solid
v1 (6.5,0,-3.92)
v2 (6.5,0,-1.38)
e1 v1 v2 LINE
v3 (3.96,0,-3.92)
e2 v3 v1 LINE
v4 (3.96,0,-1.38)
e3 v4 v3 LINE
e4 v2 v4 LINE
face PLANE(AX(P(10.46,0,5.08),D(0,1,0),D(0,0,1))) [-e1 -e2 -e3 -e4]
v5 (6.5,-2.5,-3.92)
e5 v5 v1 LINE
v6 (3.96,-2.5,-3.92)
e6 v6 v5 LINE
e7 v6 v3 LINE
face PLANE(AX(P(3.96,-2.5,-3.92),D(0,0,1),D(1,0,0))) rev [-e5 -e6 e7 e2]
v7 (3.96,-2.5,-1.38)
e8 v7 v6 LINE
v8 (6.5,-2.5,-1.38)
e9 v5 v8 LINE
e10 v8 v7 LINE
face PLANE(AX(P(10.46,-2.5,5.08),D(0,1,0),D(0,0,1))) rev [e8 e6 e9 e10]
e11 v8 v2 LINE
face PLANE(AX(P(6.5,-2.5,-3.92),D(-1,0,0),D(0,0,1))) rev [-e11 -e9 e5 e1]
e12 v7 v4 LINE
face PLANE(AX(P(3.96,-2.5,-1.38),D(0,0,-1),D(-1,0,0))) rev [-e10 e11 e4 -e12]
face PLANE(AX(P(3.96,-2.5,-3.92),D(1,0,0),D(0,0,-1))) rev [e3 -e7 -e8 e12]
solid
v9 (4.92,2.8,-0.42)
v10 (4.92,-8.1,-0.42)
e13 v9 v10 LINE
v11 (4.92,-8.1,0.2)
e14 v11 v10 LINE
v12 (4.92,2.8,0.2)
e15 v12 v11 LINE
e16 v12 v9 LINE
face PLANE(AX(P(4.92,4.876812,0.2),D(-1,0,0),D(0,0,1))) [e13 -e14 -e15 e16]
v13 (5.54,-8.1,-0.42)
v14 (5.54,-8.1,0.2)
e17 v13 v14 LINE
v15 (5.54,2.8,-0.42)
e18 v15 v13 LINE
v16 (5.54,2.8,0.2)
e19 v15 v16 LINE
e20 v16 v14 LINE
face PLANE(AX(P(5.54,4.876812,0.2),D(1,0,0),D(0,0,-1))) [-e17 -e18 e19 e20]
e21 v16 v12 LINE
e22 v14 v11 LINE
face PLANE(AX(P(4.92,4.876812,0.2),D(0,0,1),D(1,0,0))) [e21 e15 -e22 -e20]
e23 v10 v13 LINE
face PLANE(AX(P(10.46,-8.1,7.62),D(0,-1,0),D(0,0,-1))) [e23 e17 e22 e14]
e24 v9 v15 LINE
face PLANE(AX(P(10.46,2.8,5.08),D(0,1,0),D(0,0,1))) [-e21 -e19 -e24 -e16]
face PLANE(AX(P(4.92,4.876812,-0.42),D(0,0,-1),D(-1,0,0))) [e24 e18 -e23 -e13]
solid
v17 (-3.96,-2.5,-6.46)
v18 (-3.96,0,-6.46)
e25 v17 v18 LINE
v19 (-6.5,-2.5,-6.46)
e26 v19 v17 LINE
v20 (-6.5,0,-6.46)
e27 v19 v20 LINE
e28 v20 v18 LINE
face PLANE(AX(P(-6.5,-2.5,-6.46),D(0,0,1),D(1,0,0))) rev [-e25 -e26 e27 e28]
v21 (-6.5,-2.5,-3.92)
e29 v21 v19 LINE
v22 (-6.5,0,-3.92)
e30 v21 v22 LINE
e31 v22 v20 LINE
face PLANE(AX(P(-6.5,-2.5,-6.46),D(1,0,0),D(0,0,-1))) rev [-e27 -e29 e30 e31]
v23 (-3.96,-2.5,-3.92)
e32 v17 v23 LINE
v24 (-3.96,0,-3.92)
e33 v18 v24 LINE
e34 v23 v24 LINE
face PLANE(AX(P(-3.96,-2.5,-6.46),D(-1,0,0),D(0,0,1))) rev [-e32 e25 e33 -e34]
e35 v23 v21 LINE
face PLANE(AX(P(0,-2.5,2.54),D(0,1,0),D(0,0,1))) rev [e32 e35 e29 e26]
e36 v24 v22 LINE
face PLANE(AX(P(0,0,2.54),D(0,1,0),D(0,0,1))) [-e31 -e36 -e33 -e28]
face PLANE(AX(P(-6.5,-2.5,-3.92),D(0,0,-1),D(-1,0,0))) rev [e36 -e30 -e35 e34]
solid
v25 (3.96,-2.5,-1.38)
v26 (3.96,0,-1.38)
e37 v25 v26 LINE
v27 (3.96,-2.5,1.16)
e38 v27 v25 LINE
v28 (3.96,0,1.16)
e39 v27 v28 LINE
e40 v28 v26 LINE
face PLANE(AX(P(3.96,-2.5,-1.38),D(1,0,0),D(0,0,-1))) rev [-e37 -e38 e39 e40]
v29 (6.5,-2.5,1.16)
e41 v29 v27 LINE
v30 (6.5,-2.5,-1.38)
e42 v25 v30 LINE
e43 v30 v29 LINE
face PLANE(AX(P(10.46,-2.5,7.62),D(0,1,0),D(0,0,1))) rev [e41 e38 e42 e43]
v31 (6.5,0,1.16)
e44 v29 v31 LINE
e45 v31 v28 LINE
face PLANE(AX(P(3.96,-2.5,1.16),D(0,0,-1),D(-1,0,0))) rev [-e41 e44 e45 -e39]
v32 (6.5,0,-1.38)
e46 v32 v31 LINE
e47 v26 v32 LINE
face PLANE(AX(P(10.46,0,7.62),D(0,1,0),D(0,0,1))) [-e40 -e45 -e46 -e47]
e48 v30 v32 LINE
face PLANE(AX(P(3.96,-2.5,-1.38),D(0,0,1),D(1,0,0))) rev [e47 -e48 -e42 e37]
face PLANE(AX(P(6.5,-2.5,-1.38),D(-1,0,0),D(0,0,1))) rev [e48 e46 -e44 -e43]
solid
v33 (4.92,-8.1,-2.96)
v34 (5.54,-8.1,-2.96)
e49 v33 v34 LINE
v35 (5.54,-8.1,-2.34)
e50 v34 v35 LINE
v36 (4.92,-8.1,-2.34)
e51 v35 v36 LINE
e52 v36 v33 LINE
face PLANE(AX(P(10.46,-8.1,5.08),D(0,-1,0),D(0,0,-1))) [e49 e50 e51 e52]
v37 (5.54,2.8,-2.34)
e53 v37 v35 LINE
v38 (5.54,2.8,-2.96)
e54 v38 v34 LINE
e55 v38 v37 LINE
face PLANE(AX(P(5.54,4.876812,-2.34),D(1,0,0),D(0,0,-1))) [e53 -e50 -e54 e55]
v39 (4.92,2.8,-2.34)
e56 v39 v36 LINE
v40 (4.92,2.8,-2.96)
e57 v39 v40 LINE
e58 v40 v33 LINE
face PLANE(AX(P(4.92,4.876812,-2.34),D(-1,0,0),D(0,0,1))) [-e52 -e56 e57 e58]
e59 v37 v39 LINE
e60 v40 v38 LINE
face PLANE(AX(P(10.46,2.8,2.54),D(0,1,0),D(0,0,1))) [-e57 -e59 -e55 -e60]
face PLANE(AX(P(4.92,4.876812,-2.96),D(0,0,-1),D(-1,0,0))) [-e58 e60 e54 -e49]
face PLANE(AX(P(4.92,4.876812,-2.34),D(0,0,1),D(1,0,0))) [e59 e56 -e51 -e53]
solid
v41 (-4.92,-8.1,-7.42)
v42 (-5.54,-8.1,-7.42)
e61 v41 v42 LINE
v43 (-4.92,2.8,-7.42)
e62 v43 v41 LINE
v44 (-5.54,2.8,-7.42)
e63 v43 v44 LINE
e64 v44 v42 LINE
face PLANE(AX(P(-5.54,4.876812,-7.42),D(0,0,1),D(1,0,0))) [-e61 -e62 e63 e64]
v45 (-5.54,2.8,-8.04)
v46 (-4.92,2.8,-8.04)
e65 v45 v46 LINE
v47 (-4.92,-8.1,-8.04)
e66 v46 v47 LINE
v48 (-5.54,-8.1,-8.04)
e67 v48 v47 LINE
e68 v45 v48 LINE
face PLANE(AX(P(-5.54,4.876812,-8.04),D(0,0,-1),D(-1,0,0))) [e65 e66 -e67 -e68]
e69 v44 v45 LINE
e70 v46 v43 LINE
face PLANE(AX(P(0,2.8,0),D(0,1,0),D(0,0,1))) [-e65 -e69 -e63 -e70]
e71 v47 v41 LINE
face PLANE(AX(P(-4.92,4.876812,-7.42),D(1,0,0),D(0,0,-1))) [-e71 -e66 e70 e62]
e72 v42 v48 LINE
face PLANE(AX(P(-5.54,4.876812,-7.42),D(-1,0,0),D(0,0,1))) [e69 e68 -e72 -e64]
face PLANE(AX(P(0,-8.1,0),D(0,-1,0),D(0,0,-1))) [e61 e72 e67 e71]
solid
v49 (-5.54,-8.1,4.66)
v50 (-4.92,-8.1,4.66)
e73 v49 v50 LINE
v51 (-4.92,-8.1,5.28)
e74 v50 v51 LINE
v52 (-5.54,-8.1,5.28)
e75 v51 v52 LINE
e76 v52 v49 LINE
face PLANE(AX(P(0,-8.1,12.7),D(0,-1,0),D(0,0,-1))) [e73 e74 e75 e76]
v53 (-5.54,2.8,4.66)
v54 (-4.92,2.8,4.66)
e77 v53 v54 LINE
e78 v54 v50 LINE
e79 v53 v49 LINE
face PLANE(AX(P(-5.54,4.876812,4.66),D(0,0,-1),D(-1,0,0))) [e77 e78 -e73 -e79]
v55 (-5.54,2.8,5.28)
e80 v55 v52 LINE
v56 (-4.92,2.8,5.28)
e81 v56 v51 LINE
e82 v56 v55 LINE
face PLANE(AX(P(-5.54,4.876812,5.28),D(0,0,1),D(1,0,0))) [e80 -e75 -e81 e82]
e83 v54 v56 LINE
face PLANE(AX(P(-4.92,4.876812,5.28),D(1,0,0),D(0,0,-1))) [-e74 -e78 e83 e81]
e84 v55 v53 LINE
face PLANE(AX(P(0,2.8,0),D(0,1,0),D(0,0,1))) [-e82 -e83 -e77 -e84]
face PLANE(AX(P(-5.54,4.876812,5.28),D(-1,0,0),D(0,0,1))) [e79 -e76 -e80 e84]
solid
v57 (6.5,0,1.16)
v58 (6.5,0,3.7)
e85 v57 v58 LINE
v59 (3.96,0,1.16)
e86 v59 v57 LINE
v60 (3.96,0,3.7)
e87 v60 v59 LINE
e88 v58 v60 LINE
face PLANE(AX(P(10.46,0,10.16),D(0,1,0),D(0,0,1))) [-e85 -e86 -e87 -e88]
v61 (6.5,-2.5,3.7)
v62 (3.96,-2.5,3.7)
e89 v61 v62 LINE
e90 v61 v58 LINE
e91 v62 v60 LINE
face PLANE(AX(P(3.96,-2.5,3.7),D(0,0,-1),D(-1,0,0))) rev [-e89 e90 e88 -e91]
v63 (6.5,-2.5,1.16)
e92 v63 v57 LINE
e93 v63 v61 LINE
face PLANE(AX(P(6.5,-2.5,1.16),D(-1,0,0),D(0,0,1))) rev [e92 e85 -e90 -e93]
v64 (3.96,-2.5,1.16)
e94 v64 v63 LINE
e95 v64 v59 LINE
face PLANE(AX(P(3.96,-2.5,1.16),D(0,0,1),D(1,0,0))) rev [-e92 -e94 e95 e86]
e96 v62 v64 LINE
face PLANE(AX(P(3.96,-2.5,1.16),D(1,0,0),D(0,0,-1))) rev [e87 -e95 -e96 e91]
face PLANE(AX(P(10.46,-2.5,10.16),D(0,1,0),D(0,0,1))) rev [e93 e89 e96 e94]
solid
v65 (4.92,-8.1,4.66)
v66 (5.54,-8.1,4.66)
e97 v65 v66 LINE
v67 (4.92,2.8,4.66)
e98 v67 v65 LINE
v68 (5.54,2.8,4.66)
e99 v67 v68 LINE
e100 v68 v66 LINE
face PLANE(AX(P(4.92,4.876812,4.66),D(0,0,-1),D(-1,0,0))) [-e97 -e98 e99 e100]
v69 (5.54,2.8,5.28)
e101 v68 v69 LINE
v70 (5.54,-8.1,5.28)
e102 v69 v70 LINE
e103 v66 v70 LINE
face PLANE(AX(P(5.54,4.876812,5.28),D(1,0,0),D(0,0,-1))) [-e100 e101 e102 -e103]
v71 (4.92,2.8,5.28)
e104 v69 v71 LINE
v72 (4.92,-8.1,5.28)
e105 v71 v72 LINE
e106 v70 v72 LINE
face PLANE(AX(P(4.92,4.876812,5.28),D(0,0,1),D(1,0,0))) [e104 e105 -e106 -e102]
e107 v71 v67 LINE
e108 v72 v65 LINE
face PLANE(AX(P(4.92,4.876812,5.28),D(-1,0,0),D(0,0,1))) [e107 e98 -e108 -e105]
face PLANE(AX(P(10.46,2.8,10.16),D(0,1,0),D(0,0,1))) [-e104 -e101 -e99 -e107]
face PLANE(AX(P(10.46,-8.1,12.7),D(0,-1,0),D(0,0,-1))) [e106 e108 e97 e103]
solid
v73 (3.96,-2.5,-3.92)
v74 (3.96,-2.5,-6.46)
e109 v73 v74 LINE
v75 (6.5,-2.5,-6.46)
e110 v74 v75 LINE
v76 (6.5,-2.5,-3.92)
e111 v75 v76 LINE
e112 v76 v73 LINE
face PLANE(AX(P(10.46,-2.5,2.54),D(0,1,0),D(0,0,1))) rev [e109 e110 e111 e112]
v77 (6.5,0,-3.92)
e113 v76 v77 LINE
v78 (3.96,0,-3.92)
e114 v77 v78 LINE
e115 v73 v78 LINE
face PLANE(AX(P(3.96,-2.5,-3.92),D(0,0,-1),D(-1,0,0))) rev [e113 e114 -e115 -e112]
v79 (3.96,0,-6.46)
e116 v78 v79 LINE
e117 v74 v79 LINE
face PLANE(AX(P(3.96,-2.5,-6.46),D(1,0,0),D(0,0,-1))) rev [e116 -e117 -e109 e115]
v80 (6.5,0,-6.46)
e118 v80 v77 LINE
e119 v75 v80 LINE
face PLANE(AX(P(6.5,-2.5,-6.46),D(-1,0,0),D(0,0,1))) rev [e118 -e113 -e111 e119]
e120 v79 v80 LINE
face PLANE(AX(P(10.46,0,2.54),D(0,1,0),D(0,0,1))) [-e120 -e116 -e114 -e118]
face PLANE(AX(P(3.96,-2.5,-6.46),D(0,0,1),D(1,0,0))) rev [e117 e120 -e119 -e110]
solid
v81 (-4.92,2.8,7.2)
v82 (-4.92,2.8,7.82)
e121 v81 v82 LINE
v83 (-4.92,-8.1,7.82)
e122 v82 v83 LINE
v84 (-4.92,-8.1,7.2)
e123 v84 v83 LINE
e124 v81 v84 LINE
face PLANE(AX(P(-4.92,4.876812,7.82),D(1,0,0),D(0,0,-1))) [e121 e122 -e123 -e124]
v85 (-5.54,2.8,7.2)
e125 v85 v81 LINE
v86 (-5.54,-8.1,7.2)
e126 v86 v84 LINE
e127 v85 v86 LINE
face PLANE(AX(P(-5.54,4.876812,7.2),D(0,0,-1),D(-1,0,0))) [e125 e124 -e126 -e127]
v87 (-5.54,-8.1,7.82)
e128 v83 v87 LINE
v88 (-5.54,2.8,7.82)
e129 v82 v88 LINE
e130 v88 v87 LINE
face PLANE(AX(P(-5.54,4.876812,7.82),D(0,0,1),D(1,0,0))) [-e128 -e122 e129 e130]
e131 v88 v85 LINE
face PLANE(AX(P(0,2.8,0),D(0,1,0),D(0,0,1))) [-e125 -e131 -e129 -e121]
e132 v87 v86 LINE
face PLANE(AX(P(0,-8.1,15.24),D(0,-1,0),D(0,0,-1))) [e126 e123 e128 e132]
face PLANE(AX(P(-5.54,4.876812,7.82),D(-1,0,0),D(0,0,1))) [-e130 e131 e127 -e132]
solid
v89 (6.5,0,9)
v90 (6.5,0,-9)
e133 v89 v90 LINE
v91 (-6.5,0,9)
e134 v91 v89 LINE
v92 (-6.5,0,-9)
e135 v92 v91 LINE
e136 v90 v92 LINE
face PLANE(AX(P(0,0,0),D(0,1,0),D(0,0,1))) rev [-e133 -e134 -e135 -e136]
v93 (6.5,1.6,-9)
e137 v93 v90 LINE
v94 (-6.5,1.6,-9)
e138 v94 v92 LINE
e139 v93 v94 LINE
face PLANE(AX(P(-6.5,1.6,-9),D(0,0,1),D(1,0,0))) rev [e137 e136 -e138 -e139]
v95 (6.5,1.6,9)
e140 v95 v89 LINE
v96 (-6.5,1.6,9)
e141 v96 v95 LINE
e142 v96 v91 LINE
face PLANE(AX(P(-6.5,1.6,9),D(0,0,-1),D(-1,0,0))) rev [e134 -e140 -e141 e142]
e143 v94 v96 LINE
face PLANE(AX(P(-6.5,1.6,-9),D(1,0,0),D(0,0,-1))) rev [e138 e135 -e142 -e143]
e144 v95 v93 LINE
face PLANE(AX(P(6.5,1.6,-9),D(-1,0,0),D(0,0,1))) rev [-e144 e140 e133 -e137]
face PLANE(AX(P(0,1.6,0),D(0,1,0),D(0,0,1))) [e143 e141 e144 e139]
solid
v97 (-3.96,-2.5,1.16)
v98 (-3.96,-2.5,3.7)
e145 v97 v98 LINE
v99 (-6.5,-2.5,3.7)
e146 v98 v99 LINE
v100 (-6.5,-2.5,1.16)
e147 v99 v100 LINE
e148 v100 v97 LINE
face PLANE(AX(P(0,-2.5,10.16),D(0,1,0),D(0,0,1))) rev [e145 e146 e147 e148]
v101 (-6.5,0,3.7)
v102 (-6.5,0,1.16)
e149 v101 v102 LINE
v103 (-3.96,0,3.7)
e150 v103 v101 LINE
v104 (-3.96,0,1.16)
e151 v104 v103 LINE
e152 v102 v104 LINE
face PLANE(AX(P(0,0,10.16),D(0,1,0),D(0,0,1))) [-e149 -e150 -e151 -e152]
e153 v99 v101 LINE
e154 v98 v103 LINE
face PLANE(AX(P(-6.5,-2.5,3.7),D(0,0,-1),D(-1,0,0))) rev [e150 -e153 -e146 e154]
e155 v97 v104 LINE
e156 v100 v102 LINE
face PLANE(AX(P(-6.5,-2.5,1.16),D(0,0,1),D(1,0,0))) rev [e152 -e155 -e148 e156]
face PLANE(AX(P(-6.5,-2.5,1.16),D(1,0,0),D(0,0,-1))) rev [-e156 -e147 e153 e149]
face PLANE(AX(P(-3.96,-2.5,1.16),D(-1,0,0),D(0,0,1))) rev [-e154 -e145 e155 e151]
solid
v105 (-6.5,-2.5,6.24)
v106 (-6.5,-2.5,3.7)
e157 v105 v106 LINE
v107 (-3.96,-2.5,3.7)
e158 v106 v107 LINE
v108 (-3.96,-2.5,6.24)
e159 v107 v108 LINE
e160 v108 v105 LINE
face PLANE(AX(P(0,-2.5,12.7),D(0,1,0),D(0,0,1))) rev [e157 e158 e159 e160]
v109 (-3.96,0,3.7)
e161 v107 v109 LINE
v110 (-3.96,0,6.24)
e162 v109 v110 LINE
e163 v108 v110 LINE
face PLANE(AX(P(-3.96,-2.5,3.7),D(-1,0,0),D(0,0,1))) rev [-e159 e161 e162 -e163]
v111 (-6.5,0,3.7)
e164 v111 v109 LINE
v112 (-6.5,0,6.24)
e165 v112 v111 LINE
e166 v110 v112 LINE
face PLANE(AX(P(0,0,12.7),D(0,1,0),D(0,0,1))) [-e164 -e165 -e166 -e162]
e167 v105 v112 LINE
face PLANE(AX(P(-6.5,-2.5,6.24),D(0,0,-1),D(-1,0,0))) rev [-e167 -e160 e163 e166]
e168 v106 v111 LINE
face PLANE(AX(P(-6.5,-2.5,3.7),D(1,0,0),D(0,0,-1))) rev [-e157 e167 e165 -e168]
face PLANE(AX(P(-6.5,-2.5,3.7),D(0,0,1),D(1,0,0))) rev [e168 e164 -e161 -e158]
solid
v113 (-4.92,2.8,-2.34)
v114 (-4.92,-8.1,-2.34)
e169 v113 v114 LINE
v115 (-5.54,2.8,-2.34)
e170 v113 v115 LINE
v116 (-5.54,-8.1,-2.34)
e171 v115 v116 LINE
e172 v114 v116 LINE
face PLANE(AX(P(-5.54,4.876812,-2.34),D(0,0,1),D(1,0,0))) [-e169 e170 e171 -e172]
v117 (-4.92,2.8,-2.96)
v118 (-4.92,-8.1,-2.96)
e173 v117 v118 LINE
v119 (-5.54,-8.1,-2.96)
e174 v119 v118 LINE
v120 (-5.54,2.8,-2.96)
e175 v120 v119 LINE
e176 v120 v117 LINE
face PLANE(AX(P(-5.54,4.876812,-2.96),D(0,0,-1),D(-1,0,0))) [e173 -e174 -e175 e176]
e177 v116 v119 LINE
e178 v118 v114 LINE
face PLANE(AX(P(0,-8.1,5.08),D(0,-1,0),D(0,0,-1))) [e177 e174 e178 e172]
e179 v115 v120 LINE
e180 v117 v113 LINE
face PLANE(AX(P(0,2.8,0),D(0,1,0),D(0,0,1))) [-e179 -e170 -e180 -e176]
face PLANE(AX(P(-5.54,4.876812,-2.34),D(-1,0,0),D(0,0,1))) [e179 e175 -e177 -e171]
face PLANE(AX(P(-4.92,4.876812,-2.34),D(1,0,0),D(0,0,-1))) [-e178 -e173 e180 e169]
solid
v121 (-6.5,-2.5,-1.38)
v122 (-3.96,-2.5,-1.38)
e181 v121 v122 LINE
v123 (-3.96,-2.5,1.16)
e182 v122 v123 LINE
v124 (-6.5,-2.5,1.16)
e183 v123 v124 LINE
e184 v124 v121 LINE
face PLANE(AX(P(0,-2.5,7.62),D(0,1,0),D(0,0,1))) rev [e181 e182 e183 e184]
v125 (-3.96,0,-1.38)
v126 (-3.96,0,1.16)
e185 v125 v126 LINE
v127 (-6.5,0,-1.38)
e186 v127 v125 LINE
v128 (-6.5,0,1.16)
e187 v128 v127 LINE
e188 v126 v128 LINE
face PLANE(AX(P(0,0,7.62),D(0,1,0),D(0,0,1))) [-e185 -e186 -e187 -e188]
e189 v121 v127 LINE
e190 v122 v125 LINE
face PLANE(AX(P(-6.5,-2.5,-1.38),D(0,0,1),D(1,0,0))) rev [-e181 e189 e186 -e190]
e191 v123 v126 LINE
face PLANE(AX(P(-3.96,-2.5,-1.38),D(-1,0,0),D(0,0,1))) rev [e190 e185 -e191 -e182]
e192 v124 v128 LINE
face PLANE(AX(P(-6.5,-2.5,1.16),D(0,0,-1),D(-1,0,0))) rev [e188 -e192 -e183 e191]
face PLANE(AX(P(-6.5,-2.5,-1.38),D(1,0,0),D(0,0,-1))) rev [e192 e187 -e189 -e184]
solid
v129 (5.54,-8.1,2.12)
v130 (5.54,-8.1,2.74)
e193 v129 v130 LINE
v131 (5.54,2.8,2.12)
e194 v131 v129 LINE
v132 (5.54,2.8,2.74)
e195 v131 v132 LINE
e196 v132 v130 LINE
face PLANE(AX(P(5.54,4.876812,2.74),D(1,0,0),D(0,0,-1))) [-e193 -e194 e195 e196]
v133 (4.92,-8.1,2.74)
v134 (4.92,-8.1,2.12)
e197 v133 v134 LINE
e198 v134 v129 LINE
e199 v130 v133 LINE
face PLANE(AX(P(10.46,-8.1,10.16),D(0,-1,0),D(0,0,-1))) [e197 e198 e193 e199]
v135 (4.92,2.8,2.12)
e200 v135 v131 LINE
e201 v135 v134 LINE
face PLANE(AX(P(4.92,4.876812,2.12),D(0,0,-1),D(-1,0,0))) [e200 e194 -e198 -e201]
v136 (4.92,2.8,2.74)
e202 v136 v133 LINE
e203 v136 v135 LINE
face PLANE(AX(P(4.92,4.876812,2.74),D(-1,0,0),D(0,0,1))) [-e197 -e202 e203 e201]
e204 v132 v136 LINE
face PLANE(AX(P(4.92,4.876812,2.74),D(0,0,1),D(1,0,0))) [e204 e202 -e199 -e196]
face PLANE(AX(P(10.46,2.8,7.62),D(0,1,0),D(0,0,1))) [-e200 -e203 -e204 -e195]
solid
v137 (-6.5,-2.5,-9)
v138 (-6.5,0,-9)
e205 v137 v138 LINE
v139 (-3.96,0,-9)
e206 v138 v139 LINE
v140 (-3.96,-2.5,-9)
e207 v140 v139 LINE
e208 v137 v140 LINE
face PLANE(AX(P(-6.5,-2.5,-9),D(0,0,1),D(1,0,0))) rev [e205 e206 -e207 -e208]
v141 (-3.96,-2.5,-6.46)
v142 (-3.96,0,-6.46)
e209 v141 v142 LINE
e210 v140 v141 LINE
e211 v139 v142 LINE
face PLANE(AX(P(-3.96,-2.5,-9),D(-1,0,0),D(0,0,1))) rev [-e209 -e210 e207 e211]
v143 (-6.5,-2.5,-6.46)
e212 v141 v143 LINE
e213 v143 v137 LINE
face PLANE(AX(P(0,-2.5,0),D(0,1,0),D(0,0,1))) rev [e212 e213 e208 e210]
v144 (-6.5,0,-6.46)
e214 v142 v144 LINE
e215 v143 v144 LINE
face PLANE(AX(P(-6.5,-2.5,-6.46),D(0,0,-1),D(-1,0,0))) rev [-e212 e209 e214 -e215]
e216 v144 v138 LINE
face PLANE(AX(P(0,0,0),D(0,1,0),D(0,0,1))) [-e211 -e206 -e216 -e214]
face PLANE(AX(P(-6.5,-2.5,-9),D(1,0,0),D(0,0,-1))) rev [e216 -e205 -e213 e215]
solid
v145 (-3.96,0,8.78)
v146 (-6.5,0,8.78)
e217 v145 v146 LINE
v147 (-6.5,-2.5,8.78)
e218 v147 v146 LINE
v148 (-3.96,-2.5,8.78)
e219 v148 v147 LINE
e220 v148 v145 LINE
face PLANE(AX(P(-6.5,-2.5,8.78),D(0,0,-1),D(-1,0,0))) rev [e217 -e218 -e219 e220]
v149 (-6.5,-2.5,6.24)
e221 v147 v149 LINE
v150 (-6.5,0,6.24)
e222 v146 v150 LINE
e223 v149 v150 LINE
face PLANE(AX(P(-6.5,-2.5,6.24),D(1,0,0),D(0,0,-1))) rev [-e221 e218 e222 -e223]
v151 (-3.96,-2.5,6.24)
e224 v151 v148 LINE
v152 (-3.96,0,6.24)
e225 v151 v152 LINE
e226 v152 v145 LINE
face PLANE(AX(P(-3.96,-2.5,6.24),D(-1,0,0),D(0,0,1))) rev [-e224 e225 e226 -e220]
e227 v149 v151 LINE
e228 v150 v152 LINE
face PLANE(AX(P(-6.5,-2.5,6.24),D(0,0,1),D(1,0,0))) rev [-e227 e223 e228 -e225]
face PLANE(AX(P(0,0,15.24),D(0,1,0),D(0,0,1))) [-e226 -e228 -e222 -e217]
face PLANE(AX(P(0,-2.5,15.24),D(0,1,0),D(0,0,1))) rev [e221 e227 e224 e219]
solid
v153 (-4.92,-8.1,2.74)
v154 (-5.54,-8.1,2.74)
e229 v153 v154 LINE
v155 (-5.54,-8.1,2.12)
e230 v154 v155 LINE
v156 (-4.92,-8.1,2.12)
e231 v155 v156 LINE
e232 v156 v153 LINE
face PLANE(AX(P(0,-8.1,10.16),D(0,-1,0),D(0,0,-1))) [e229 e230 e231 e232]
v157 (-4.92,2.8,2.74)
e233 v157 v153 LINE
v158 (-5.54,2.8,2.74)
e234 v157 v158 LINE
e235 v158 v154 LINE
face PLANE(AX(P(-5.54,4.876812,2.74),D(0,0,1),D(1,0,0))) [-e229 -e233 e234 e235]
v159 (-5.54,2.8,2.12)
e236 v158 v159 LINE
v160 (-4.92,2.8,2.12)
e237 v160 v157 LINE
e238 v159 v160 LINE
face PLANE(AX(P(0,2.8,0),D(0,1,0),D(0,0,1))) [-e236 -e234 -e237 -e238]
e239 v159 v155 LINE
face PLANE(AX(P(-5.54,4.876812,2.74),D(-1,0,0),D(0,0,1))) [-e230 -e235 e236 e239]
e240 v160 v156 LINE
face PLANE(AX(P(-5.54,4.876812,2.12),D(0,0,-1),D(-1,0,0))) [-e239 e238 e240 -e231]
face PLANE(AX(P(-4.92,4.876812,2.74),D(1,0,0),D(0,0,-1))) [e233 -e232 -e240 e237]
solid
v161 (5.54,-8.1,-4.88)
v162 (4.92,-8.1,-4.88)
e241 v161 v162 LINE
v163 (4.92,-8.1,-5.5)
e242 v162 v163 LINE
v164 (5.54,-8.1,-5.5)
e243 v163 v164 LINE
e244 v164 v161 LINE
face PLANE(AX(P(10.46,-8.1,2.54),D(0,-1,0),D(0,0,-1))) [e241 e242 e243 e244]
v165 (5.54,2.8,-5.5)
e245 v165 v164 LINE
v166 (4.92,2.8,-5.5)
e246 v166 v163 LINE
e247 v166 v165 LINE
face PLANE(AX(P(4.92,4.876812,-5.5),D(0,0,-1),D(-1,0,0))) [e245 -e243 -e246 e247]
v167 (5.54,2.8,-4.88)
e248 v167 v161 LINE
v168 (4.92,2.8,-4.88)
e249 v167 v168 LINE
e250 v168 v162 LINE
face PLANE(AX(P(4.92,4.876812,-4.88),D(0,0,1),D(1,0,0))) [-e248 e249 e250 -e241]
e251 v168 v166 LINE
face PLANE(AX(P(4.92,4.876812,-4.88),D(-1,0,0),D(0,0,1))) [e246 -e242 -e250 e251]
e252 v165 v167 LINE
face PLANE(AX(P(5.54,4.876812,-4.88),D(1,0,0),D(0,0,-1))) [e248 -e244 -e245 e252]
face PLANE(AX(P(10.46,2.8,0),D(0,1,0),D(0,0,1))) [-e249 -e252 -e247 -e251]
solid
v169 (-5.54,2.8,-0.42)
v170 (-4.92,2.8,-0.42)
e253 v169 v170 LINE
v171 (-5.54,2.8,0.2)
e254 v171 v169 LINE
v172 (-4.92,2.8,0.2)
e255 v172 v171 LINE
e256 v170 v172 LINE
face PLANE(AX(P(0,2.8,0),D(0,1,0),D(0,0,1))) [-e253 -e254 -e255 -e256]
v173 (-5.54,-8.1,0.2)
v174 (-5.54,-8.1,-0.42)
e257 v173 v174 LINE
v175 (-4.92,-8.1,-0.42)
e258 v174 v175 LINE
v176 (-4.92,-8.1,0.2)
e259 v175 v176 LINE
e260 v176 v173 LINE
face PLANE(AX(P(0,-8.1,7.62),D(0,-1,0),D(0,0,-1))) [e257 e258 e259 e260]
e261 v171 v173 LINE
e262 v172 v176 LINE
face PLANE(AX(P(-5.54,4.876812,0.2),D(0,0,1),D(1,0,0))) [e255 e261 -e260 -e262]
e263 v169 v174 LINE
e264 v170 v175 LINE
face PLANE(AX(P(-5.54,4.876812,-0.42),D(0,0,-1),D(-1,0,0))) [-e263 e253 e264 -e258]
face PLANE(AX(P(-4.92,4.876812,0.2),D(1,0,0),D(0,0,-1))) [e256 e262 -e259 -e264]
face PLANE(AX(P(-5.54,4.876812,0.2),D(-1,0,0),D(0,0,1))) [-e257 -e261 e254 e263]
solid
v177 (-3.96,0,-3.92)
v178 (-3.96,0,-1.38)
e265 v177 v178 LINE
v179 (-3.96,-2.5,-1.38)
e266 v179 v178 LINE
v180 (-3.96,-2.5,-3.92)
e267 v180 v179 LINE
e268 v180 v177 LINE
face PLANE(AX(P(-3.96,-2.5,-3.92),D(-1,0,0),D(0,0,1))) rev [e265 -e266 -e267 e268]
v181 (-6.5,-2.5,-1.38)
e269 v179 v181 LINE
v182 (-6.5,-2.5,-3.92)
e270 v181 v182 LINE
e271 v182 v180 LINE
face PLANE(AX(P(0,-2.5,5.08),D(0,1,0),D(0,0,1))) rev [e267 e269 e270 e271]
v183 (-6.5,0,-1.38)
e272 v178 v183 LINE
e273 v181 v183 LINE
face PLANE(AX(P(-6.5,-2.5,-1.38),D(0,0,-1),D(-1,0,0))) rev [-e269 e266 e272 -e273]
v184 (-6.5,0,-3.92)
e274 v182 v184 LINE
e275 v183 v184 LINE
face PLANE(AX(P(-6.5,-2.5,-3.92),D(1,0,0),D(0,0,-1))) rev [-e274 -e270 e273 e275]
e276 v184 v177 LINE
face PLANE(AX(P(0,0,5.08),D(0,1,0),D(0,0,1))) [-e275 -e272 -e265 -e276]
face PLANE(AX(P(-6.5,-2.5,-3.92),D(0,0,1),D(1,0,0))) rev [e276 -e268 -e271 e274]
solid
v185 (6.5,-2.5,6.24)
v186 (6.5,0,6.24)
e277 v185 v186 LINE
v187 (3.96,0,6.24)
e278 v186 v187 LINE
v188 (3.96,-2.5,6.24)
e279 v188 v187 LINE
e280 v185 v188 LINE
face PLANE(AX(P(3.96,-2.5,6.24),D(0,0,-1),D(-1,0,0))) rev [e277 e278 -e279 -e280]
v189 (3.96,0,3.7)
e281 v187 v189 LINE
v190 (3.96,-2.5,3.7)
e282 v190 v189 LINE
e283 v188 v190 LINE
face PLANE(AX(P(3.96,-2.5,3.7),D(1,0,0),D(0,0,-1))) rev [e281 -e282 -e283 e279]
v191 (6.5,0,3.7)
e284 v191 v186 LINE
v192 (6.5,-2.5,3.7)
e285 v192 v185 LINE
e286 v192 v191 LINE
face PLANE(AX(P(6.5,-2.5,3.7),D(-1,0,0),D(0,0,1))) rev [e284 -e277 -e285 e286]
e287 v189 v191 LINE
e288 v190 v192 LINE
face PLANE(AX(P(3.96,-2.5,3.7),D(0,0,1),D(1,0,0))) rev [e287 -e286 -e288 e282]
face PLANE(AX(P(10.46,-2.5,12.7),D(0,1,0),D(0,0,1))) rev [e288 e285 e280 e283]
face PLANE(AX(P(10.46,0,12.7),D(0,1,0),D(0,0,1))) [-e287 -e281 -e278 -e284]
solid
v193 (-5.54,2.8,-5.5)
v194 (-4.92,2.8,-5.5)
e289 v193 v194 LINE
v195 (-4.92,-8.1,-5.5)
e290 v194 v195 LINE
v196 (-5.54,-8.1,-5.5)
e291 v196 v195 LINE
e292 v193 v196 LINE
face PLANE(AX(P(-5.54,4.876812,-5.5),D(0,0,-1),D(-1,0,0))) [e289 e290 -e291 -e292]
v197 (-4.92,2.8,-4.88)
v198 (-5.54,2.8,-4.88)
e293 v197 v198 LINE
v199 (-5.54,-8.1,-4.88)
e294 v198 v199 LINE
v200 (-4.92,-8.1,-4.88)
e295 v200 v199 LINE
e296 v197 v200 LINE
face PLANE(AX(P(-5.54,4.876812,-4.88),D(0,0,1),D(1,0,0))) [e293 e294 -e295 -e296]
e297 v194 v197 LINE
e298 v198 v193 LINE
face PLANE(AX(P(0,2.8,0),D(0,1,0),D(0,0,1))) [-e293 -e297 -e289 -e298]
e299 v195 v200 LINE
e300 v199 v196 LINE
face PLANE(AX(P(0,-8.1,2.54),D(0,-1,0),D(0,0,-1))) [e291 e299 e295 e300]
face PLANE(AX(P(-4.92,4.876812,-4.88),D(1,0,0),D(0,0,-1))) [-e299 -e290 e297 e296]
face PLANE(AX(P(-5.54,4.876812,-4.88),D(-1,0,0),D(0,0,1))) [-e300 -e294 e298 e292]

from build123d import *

# Parameters (mm, degrees)
SKETCH1_W              = 13
SKETCH1_H              = 18
BOSS_EXTRUDE1_DEPTH    = 1.6
SKETCH6_W              = 2.54
SKETCH6_H              = 2.54
BOSS_EXTRUDE2_DEPTH    = 2.5
BOSS_EXTRUDE3_START    = -5.3
SKETCH7_W              = 0.62
SKETCH7_H              = 0.62
BOSS_EXTRUDE3_DEPTH    = 10.9
LPATTERN1_START        = -8.1
LPATTERN1_OUTLINE_W    = 0.62
LPATTERN1_OUTLINE_H    = 0.62
LPATTERN1_DEPTH        = 10.9
LPATTERN1_2_OUTLINE_W  = 0.62
LPATTERN1_2_OUTLINE_H  = 0.62
LPATTERN1_2_DEPTH      = 10.9
LPATTERN1_3_OUTLINE_W  = 0.62
LPATTERN1_3_OUTLINE_H  = 0.62
LPATTERN1_3_DEPTH      = 10.9
LPATTERN1_4_OUTLINE_W  = 0.62
LPATTERN1_4_OUTLINE_H  = 0.62
LPATTERN1_4_DEPTH      = 10.9
LPATTERN1_5_OUTLINE_W  = 0.62
LPATTERN1_5_OUTLINE_H  = 0.62
LPATTERN1_5_DEPTH      = 10.9
LPATTERN1_6_OUTLINE_W  = 0.62
LPATTERN1_6_OUTLINE_H  = 0.62
LPATTERN1_6_DEPTH      = 10.9
LPATTERN1_START_2      = -6.5
LPATTERN1_7_OUTLINE_W  = 2.5
LPATTERN1_7_OUTLINE_H  = 2.54
LPATTERN1_7_DEPTH      = 2.54
LPATTERN1_8_OUTLINE_W  = 2.5
LPATTERN1_8_OUTLINE_H  = 2.54
LPATTERN1_8_DEPTH      = 2.54
LPATTERN1_9_OUTLINE_W  = 2.5
LPATTERN1_9_OUTLINE_H  = 2.54
LPATTERN1_9_DEPTH      = 2.54
LPATTERN1_10_OUTLINE_W = 2.5
LPATTERN1_10_OUTLINE_H = 2.54
LPATTERN1_10_DEPTH     = 2.54
LPATTERN1_11_OUTLINE_W = 2.5
LPATTERN1_11_OUTLINE_H = 2.54
LPATTERN1_11_DEPTH     = 2.54
LPATTERN1_12_OUTLINE_W = 2.5
LPATTERN1_12_OUTLINE_H = 2.54
LPATTERN1_12_DEPTH     = 2.54
LPATTERN2_START        = -2.5
LPATTERN2_OUTLINE_W    = 2.54
LPATTERN2_OUTLINE_H    = 2.54
LPATTERN2_DEPTH        = 2.5
LPATTERN2_START_2      = -8.1
LPATTERN2_2_OUTLINE_W  = 0.62
LPATTERN2_2_OUTLINE_H  = 0.62
LPATTERN2_2_DEPTH      = 10.9
LPATTERN3_COUNT        = 5
LPATTERN3_PITCH        = 2.54


# Read off the part's stored shape, not the designer's step: LPattern1, LPattern2
with BuildPart() as part:
    # Sketch1 → Boss-Extrude1 (new body)
    with BuildSketch(Plane(origin=(0, 0, 0), x_dir=(1, 0, 0), z_dir=(0, 1, 0))):
        Rectangle(SKETCH1_W, SKETCH1_H)
    extrude(amount=BOSS_EXTRUDE1_DEPTH)


with BuildPart() as body_2:
    # Sketch6 → Boss-Extrude2 (new body)
    with BuildSketch(Plane.XZ):
        with Locations((-5.23, -7.73)):
            Rectangle(SKETCH6_W, SKETCH6_H)
    extrude(amount=BOSS_EXTRUDE2_DEPTH)


with BuildPart() as body_3:
    # Sketch7 → Boss-Extrude3 (new body)
    with BuildSketch(Plane.XZ.offset(2.5).offset(BOSS_EXTRUDE3_START)):
        with Locations((-5.23, -7.73)):
            Rectangle(SKETCH7_W, SKETCH7_H)
    extrude(amount=BOSS_EXTRUDE3_DEPTH)


with BuildPart() as body_4:
    # LPattern1 outline → LPattern1 (new body)
    with BuildSketch(Plane(origin=(0, 0, 0), x_dir=(1, 0, 0), z_dir=(0, 1, 0)).offset(LPATTERN1_START)):
        with Locations((-5.23, -7.51)):
            Rectangle(LPATTERN1_OUTLINE_W, LPATTERN1_OUTLINE_H)
    extrude(amount=LPATTERN1_DEPTH)


with BuildPart() as body_5:
    # LPattern1 2 outline → LPattern1 2 (new body)
    with BuildSketch(Plane(origin=(0, 0, 0), x_dir=(1, 0, 0), z_dir=(0, 1, 0)).offset(LPATTERN1_START)):
        with Locations((-5.23, -4.97)):
            Rectangle(LPATTERN1_2_OUTLINE_W, LPATTERN1_2_OUTLINE_H)
    extrude(amount=LPATTERN1_2_DEPTH)


with BuildPart() as body_6:
    # LPattern1 3 outline → LPattern1 3 (new body)
    with BuildSketch(Plane(origin=(0, 0, 0), x_dir=(1, 0, 0), z_dir=(0, 1, 0)).offset(LPATTERN1_START)):
        with Locations((-5.23, -2.43)):
            Rectangle(LPATTERN1_3_OUTLINE_W, LPATTERN1_3_OUTLINE_H)
    extrude(amount=LPATTERN1_3_DEPTH)


with BuildPart() as body_7:
    # LPattern1 4 outline → LPattern1 4 (new body)
    with BuildSketch(Plane(origin=(0, 0, 0), x_dir=(1, 0, 0), z_dir=(0, 1, 0)).offset(LPATTERN1_START)):
        with Locations((-5.23, 0.11)):
            Rectangle(LPATTERN1_4_OUTLINE_W, LPATTERN1_4_OUTLINE_H)
    extrude(amount=LPATTERN1_4_DEPTH)


with BuildPart() as body_8:
    # LPattern1 5 outline → LPattern1 5 (new body)
    with BuildSketch(Plane(origin=(0, 0, 0), x_dir=(1, 0, 0), z_dir=(0, 1, 0)).offset(LPATTERN1_START)):
        with Locations((-5.23, 2.65)):
            Rectangle(LPATTERN1_5_OUTLINE_W, LPATTERN1_5_OUTLINE_H)
    extrude(amount=LPATTERN1_5_DEPTH)


with BuildPart() as body_9:
    # LPattern1 6 outline → LPattern1 6 (new body)
    with BuildSketch(Plane(origin=(0, 0, 0), x_dir=(1, 0, 0), z_dir=(0, 1, 0)).offset(LPATTERN1_START)):
        with Locations((-5.23, 5.19)):
            Rectangle(LPATTERN1_6_OUTLINE_W, LPATTERN1_6_OUTLINE_H)
    extrude(amount=LPATTERN1_6_DEPTH)


with BuildPart() as body_10:
    # LPattern1 7 outline → LPattern1 7 (new body)
    with BuildSketch(Plane.YZ.offset(LPATTERN1_START_2)):
        with Locations((-1.25, 7.51)):
            Rectangle(LPATTERN1_7_OUTLINE_W, LPATTERN1_7_OUTLINE_H)
    extrude(amount=LPATTERN1_7_DEPTH)


with BuildPart() as body_11:
    # LPattern1 8 outline → LPattern1 8 (new body)
    with BuildSketch(Plane.YZ.offset(LPATTERN1_START_2)):
        with Locations((-1.25, 4.97)):
            Rectangle(LPATTERN1_8_OUTLINE_W, LPATTERN1_8_OUTLINE_H)
    extrude(amount=LPATTERN1_8_DEPTH)


with BuildPart() as body_12:
    # LPattern1 9 outline → LPattern1 9 (new body)
    with BuildSketch(Plane.YZ.offset(LPATTERN1_START_2)):
        with Locations((-1.25, 2.43)):
            Rectangle(LPATTERN1_9_OUTLINE_W, LPATTERN1_9_OUTLINE_H)
    extrude(amount=LPATTERN1_9_DEPTH)


with BuildPart() as body_13:
    # LPattern1 10 outline → LPattern1 10 (new body)
    with BuildSketch(Plane.YZ.offset(LPATTERN1_START_2)):
        with Locations((-1.25, -0.11)):
            Rectangle(LPATTERN1_10_OUTLINE_W, LPATTERN1_10_OUTLINE_H)
    extrude(amount=LPATTERN1_10_DEPTH)


with BuildPart() as body_14:
    # LPattern1 11 outline → LPattern1 11 (new body)
    with BuildSketch(Plane.YZ.offset(LPATTERN1_START_2)):
        with Locations((-1.25, -2.65)):
            Rectangle(LPATTERN1_11_OUTLINE_W, LPATTERN1_11_OUTLINE_H)
    extrude(amount=LPATTERN1_11_DEPTH)


with BuildPart() as body_15:
    # LPattern1 12 outline → LPattern1 12 (new body)
    with BuildSketch(Plane.YZ.offset(LPATTERN1_START_2)):
        with Locations((-1.25, -5.19)):
            Rectangle(LPATTERN1_12_OUTLINE_W, LPATTERN1_12_OUTLINE_H)
    extrude(amount=LPATTERN1_12_DEPTH)


with BuildPart() as body_16:
    # LPattern2 outline → LPattern2 (new body)
    with BuildSketch(Plane(origin=(0, 0, 0), x_dir=(1, 0, 0), z_dir=(0, 1, 0)).offset(LPATTERN2_START)):
        with Locations((5.23, 5.19)):
            Rectangle(LPATTERN2_OUTLINE_W, LPATTERN2_OUTLINE_H)
    extrude(amount=LPATTERN2_DEPTH)


with BuildPart() as body_17:
    # LPattern2 2 outline → LPattern2 2 (new body)
    with BuildSketch(Plane(origin=(0, 0, 0), x_dir=(1, 0, 0), z_dir=(0, 1, 0)).offset(LPATTERN2_START_2)):
        with Locations((5.23, 5.19)):
            Rectangle(LPATTERN2_2_OUTLINE_W, LPATTERN2_2_OUTLINE_H)
    extrude(amount=LPATTERN2_2_DEPTH)


with BuildPart() as lpattern3_1:
    # LPattern3: pattern copy
    add(body_17.part.moved(Location(Vector(0, 0, 1) * (1 * LPATTERN3_PITCH))))


with BuildPart() as lpattern3_2:
    # LPattern3: pattern copy
    add(body_17.part.moved(Location(Vector(0, 0, 1) * (2 * LPATTERN3_PITCH))))


with BuildPart() as lpattern3_3:
    # LPattern3: pattern copy
    add(body_17.part.moved(Location(Vector(0, 0, 1) * (3 * LPATTERN3_PITCH))))


with BuildPart() as lpattern3_4:
    # LPattern3: pattern copy
    add(body_17.part.moved(Location(Vector(0, 0, 1) * (4 * LPATTERN3_PITCH))))


with BuildPart() as lpattern3_5:
    # LPattern3: pattern copy
    add(body_16.part.moved(Location(Vector(0, 0, 1) * (1 * LPATTERN3_PITCH))))


with BuildPart() as lpattern3_6:
    # LPattern3: pattern copy
    add(body_16.part.moved(Location(Vector(0, 0, 1) * (2 * LPATTERN3_PITCH))))


with BuildPart() as lpattern3_7:
    # LPattern3: pattern copy
    add(body_16.part.moved(Location(Vector(0, 0, 1) * (3 * LPATTERN3_PITCH))))


with BuildPart() as lpattern3_8:
    # LPattern3: pattern copy
    add(body_16.part.moved(Location(Vector(0, 0, 1) * (4 * LPATTERN3_PITCH))))


solid = Compound([part.part, body_2.part, body_3.part, body_4.part, body_5.part, body_6.part, body_7.part, body_8.part, body_9.part, body_10.part, body_11.part, body_12.part, body_13.part, body_14.part, body_15.part, body_16.part, body_17.part, lpattern3_1.part, lpattern3_2.part, lpattern3_3.part, lpattern3_4.part, lpattern3_5.part, lpattern3_6.part, lpattern3_7.part, lpattern3_8.part])
